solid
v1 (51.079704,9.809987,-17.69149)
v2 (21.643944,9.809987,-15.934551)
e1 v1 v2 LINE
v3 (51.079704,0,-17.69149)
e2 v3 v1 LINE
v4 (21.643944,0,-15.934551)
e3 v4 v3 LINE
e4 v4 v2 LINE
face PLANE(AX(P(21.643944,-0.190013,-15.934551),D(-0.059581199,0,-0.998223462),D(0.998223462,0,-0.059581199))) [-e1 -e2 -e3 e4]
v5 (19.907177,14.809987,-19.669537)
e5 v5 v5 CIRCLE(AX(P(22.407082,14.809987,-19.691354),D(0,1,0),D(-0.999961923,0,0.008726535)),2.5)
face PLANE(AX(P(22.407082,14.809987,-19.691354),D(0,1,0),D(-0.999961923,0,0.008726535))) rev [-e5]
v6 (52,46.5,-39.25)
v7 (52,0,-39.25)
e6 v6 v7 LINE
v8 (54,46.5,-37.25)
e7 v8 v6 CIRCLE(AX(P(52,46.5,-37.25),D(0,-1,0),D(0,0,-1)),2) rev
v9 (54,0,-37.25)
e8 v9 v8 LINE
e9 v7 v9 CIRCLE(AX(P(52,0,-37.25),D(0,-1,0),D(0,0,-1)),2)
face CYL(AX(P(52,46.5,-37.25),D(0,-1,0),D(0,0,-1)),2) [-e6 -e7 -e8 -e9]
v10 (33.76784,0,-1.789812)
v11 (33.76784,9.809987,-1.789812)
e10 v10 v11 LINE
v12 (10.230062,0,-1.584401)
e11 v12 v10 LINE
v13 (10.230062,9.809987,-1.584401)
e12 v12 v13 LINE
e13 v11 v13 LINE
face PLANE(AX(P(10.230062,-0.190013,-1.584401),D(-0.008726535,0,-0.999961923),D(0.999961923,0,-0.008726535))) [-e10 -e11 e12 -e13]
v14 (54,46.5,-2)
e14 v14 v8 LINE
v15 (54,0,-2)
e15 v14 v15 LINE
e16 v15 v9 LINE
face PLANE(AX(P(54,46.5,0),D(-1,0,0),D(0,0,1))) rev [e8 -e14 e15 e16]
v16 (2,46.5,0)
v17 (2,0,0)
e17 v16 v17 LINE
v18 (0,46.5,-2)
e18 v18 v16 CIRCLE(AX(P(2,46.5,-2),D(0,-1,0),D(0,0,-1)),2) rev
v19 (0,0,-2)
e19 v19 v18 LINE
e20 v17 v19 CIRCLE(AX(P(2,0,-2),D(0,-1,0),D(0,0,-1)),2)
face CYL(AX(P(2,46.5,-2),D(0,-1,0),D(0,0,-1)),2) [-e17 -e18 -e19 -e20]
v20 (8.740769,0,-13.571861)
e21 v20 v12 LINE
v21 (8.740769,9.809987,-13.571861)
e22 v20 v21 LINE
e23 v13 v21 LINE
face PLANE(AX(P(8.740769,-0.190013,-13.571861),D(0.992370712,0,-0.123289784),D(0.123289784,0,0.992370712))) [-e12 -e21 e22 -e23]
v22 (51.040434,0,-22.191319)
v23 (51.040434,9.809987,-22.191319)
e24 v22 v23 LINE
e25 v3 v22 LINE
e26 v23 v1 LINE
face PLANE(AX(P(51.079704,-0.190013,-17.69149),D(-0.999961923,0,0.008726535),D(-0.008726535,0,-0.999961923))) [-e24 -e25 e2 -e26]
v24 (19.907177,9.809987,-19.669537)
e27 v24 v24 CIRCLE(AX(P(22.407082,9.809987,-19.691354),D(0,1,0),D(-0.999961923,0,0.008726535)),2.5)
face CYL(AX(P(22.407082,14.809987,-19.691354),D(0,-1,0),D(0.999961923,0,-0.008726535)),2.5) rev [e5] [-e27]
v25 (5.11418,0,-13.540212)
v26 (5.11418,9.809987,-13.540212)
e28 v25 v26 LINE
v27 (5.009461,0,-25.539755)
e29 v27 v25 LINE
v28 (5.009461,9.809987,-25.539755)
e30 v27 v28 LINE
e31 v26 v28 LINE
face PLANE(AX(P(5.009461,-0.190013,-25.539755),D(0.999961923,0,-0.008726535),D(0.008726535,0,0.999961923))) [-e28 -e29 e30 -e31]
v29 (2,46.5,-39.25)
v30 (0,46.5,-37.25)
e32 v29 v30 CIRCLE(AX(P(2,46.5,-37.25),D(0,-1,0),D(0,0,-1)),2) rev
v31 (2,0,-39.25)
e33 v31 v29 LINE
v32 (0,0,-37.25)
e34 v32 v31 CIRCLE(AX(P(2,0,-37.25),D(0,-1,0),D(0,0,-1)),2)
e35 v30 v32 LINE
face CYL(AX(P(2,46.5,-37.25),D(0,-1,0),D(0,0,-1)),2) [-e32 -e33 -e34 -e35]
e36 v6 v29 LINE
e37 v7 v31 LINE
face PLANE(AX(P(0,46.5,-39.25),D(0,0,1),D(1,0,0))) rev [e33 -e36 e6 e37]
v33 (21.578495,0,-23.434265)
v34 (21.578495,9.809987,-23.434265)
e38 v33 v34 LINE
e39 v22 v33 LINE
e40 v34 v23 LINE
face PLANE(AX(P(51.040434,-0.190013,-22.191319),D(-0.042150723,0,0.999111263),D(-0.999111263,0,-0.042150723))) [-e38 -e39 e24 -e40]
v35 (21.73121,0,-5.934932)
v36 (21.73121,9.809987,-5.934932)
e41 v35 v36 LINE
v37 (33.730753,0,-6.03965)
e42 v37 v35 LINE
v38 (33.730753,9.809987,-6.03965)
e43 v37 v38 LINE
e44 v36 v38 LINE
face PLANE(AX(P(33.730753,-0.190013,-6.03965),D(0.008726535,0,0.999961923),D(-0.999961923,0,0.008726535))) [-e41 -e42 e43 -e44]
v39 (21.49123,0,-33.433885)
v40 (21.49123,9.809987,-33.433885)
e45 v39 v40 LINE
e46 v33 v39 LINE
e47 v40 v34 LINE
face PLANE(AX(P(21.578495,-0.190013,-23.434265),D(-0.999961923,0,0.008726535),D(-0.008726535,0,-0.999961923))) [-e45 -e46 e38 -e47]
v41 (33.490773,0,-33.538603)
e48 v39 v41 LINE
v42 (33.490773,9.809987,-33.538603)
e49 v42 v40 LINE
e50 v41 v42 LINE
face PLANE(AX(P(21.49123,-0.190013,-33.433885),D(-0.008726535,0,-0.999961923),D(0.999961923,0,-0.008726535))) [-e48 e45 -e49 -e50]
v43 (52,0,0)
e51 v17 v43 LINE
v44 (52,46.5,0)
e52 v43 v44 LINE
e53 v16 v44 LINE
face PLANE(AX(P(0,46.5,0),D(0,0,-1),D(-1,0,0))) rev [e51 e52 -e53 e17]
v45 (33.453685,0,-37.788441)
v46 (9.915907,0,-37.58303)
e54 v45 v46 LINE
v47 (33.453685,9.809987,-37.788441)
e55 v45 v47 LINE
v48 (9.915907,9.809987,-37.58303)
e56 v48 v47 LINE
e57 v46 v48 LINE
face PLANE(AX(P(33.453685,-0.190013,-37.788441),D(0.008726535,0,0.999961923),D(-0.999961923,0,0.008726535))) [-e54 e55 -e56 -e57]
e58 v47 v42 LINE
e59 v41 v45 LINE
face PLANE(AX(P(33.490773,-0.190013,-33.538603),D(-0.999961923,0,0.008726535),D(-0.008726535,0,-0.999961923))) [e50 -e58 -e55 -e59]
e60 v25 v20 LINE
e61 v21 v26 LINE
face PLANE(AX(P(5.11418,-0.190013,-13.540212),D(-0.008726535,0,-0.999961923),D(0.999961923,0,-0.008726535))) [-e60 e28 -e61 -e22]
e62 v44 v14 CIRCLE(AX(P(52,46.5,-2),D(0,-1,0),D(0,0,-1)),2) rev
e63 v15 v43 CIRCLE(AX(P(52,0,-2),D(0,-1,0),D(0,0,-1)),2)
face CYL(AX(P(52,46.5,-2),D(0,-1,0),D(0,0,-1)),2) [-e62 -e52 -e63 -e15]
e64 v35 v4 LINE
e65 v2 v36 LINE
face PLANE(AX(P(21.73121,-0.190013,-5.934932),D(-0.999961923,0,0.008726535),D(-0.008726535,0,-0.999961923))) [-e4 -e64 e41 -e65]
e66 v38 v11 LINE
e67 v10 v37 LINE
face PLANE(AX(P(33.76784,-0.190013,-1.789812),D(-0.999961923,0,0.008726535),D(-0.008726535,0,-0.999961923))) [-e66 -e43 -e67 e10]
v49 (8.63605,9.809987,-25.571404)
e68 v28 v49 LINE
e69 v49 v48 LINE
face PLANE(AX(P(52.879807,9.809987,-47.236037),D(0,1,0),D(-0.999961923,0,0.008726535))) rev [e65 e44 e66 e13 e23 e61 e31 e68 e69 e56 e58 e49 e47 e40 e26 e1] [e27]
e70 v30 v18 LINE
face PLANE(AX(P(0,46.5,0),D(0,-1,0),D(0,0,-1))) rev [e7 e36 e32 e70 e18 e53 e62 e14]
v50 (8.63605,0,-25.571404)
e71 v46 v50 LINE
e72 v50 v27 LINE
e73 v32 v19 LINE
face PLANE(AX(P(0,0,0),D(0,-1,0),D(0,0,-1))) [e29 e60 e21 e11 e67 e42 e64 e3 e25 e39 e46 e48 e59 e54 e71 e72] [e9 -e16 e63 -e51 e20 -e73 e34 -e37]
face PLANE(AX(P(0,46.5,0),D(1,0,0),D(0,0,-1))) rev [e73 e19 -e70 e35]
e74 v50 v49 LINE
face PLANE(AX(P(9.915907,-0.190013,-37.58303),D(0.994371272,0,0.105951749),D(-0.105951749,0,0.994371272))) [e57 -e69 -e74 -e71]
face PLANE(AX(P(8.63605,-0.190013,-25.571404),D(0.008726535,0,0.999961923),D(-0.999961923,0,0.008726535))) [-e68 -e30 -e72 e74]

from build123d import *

# Parameters (mm, degrees)
SKETCH1_W              = 54
SKETCH1_H              = 39.25
BOSS_EXTRUDE1_DEPTH    = 46.5
FILLET1_R              = 2
FILLET2_R              = 2
Z_95_START             = -0.023652431
Z_95_BLANK_DEPTH       = 10
Z_95_START_2           = -5.023652431
Z_95_BLANK_2_OUTLINE_R = 2.5
Z_95_BLANK_2_DEPTH     = 5
BODY_MOVE_COPY3_ANGLE  = 180
BODY_MOVE_COPY4_ANGLE  = 89.5


with BuildPart() as part:
    # Sketch1 → Boss-Extrude1 (new body)
    with BuildSketch(Plane(origin=(0, 0, 0), x_dir=(1, 0, 0), z_dir=(0, 1, 0))):
        with Locations((27, 19.625)):
            Rectangle(SKETCH1_W, SKETCH1_H)
    extrude(amount=BOSS_EXTRUDE1_DEPTH)

    # Fillet1
    fillet1_edges = [part.edges().sort_by_distance(p)[0] for p in [
        (0, 23.25, 0),
    ]]
    fillet(fillet1_edges, radius=FILLET1_R)

    # Fillet2
    fillet2_edges = [part.edges().sort_by_distance(p)[0] for p in [
        (0, 23.25, -39.25),
        (54, 23.25, -39.25),
        (54, 23.25, 0),
    ]]
    fillet(fillet2_edges, radius=FILLET2_R)


with BuildPart() as body_2:
    # Z-95 Blank: read off the stored shape, not the designer's step
    # Z-95 Blank outline → Z-95 Blank (new body)
    with BuildSketch(Plane(origin=(0, 0, 0), x_dir=(1, 0, 0), z_dir=(0, 1, 0)).offset(Z_95_START)):
        Polygon((-39.475833264, 51.689675598), (-39.475833264, 48.062948495), (-51.475833264, 46.678320586), (-51.475833264, 23.139646129), (-47.225833264, 23.139646129), (-47.225833264, 35.139646129), (-37.225833264, 35.139646129), (-35.725833264, 5.689675598), (-31.225833264, 5.689675598), (-29.725833264, 35.139646129), (-19.725833264, 35.139646129), (-19.725833264, 23.139646129), (-15.475833264, 23.139646129), (-15.475833264, 46.678320586), (-27.475833264, 48.062948495), (-27.475833264, 51.689675598), align=None)
    extrude(amount=Z_95_BLANK_DEPTH)

    # Z-95 Blank 2 outline → Z-95 Blank 2 (add)
    with BuildSketch(Plane(origin=(0, 0, 0), x_dir=(1, 0, 0), z_dir=(0, 1, 0)).offset(Z_95_START_2)):
        with Locations((-33.475833264, 34.343753809)):
            Circle(Z_95_BLANK_2_OUTLINE_R)
    extrude(amount=Z_95_BLANK_2_DEPTH)


with BuildPart() as body_2_1:
    # Body-Move/Copy3: moved
    add(body_2.part.rotate(Axis((0, 2.476347569, -28.689675598), (1, 0, 0)), BODY_MOVE_COPY3_ANGLE))


with BuildPart() as body_2_2:
    # Body-Move/Copy4: moved
    add(body_2_1.part.rotate(Axis((-33.475833264, 0, -28.689675598), (0, -1, 0)), BODY_MOVE_COPY4_ANGLE))


with BuildPart() as body_2_3:
    # Body-Move/Copy5: moved
    add(body_2_2.part.moved(Location((61.536777905, 5.06338101, 8.948981511))))


with BuildPart() as body_2_4:
    # Body-Move/Copy6: moved
    add(body_2_3.part.moved(Location((0, -0.229742035, 0))))


with BuildPart() as part_1:
    add(part.part)

    # Intersect1: read off the stored shape, not the designer's step
    # Intersect1: cut body 2
    add(body_2_4.part, mode=Mode.SUBTRACT)


solid = part_1.part
